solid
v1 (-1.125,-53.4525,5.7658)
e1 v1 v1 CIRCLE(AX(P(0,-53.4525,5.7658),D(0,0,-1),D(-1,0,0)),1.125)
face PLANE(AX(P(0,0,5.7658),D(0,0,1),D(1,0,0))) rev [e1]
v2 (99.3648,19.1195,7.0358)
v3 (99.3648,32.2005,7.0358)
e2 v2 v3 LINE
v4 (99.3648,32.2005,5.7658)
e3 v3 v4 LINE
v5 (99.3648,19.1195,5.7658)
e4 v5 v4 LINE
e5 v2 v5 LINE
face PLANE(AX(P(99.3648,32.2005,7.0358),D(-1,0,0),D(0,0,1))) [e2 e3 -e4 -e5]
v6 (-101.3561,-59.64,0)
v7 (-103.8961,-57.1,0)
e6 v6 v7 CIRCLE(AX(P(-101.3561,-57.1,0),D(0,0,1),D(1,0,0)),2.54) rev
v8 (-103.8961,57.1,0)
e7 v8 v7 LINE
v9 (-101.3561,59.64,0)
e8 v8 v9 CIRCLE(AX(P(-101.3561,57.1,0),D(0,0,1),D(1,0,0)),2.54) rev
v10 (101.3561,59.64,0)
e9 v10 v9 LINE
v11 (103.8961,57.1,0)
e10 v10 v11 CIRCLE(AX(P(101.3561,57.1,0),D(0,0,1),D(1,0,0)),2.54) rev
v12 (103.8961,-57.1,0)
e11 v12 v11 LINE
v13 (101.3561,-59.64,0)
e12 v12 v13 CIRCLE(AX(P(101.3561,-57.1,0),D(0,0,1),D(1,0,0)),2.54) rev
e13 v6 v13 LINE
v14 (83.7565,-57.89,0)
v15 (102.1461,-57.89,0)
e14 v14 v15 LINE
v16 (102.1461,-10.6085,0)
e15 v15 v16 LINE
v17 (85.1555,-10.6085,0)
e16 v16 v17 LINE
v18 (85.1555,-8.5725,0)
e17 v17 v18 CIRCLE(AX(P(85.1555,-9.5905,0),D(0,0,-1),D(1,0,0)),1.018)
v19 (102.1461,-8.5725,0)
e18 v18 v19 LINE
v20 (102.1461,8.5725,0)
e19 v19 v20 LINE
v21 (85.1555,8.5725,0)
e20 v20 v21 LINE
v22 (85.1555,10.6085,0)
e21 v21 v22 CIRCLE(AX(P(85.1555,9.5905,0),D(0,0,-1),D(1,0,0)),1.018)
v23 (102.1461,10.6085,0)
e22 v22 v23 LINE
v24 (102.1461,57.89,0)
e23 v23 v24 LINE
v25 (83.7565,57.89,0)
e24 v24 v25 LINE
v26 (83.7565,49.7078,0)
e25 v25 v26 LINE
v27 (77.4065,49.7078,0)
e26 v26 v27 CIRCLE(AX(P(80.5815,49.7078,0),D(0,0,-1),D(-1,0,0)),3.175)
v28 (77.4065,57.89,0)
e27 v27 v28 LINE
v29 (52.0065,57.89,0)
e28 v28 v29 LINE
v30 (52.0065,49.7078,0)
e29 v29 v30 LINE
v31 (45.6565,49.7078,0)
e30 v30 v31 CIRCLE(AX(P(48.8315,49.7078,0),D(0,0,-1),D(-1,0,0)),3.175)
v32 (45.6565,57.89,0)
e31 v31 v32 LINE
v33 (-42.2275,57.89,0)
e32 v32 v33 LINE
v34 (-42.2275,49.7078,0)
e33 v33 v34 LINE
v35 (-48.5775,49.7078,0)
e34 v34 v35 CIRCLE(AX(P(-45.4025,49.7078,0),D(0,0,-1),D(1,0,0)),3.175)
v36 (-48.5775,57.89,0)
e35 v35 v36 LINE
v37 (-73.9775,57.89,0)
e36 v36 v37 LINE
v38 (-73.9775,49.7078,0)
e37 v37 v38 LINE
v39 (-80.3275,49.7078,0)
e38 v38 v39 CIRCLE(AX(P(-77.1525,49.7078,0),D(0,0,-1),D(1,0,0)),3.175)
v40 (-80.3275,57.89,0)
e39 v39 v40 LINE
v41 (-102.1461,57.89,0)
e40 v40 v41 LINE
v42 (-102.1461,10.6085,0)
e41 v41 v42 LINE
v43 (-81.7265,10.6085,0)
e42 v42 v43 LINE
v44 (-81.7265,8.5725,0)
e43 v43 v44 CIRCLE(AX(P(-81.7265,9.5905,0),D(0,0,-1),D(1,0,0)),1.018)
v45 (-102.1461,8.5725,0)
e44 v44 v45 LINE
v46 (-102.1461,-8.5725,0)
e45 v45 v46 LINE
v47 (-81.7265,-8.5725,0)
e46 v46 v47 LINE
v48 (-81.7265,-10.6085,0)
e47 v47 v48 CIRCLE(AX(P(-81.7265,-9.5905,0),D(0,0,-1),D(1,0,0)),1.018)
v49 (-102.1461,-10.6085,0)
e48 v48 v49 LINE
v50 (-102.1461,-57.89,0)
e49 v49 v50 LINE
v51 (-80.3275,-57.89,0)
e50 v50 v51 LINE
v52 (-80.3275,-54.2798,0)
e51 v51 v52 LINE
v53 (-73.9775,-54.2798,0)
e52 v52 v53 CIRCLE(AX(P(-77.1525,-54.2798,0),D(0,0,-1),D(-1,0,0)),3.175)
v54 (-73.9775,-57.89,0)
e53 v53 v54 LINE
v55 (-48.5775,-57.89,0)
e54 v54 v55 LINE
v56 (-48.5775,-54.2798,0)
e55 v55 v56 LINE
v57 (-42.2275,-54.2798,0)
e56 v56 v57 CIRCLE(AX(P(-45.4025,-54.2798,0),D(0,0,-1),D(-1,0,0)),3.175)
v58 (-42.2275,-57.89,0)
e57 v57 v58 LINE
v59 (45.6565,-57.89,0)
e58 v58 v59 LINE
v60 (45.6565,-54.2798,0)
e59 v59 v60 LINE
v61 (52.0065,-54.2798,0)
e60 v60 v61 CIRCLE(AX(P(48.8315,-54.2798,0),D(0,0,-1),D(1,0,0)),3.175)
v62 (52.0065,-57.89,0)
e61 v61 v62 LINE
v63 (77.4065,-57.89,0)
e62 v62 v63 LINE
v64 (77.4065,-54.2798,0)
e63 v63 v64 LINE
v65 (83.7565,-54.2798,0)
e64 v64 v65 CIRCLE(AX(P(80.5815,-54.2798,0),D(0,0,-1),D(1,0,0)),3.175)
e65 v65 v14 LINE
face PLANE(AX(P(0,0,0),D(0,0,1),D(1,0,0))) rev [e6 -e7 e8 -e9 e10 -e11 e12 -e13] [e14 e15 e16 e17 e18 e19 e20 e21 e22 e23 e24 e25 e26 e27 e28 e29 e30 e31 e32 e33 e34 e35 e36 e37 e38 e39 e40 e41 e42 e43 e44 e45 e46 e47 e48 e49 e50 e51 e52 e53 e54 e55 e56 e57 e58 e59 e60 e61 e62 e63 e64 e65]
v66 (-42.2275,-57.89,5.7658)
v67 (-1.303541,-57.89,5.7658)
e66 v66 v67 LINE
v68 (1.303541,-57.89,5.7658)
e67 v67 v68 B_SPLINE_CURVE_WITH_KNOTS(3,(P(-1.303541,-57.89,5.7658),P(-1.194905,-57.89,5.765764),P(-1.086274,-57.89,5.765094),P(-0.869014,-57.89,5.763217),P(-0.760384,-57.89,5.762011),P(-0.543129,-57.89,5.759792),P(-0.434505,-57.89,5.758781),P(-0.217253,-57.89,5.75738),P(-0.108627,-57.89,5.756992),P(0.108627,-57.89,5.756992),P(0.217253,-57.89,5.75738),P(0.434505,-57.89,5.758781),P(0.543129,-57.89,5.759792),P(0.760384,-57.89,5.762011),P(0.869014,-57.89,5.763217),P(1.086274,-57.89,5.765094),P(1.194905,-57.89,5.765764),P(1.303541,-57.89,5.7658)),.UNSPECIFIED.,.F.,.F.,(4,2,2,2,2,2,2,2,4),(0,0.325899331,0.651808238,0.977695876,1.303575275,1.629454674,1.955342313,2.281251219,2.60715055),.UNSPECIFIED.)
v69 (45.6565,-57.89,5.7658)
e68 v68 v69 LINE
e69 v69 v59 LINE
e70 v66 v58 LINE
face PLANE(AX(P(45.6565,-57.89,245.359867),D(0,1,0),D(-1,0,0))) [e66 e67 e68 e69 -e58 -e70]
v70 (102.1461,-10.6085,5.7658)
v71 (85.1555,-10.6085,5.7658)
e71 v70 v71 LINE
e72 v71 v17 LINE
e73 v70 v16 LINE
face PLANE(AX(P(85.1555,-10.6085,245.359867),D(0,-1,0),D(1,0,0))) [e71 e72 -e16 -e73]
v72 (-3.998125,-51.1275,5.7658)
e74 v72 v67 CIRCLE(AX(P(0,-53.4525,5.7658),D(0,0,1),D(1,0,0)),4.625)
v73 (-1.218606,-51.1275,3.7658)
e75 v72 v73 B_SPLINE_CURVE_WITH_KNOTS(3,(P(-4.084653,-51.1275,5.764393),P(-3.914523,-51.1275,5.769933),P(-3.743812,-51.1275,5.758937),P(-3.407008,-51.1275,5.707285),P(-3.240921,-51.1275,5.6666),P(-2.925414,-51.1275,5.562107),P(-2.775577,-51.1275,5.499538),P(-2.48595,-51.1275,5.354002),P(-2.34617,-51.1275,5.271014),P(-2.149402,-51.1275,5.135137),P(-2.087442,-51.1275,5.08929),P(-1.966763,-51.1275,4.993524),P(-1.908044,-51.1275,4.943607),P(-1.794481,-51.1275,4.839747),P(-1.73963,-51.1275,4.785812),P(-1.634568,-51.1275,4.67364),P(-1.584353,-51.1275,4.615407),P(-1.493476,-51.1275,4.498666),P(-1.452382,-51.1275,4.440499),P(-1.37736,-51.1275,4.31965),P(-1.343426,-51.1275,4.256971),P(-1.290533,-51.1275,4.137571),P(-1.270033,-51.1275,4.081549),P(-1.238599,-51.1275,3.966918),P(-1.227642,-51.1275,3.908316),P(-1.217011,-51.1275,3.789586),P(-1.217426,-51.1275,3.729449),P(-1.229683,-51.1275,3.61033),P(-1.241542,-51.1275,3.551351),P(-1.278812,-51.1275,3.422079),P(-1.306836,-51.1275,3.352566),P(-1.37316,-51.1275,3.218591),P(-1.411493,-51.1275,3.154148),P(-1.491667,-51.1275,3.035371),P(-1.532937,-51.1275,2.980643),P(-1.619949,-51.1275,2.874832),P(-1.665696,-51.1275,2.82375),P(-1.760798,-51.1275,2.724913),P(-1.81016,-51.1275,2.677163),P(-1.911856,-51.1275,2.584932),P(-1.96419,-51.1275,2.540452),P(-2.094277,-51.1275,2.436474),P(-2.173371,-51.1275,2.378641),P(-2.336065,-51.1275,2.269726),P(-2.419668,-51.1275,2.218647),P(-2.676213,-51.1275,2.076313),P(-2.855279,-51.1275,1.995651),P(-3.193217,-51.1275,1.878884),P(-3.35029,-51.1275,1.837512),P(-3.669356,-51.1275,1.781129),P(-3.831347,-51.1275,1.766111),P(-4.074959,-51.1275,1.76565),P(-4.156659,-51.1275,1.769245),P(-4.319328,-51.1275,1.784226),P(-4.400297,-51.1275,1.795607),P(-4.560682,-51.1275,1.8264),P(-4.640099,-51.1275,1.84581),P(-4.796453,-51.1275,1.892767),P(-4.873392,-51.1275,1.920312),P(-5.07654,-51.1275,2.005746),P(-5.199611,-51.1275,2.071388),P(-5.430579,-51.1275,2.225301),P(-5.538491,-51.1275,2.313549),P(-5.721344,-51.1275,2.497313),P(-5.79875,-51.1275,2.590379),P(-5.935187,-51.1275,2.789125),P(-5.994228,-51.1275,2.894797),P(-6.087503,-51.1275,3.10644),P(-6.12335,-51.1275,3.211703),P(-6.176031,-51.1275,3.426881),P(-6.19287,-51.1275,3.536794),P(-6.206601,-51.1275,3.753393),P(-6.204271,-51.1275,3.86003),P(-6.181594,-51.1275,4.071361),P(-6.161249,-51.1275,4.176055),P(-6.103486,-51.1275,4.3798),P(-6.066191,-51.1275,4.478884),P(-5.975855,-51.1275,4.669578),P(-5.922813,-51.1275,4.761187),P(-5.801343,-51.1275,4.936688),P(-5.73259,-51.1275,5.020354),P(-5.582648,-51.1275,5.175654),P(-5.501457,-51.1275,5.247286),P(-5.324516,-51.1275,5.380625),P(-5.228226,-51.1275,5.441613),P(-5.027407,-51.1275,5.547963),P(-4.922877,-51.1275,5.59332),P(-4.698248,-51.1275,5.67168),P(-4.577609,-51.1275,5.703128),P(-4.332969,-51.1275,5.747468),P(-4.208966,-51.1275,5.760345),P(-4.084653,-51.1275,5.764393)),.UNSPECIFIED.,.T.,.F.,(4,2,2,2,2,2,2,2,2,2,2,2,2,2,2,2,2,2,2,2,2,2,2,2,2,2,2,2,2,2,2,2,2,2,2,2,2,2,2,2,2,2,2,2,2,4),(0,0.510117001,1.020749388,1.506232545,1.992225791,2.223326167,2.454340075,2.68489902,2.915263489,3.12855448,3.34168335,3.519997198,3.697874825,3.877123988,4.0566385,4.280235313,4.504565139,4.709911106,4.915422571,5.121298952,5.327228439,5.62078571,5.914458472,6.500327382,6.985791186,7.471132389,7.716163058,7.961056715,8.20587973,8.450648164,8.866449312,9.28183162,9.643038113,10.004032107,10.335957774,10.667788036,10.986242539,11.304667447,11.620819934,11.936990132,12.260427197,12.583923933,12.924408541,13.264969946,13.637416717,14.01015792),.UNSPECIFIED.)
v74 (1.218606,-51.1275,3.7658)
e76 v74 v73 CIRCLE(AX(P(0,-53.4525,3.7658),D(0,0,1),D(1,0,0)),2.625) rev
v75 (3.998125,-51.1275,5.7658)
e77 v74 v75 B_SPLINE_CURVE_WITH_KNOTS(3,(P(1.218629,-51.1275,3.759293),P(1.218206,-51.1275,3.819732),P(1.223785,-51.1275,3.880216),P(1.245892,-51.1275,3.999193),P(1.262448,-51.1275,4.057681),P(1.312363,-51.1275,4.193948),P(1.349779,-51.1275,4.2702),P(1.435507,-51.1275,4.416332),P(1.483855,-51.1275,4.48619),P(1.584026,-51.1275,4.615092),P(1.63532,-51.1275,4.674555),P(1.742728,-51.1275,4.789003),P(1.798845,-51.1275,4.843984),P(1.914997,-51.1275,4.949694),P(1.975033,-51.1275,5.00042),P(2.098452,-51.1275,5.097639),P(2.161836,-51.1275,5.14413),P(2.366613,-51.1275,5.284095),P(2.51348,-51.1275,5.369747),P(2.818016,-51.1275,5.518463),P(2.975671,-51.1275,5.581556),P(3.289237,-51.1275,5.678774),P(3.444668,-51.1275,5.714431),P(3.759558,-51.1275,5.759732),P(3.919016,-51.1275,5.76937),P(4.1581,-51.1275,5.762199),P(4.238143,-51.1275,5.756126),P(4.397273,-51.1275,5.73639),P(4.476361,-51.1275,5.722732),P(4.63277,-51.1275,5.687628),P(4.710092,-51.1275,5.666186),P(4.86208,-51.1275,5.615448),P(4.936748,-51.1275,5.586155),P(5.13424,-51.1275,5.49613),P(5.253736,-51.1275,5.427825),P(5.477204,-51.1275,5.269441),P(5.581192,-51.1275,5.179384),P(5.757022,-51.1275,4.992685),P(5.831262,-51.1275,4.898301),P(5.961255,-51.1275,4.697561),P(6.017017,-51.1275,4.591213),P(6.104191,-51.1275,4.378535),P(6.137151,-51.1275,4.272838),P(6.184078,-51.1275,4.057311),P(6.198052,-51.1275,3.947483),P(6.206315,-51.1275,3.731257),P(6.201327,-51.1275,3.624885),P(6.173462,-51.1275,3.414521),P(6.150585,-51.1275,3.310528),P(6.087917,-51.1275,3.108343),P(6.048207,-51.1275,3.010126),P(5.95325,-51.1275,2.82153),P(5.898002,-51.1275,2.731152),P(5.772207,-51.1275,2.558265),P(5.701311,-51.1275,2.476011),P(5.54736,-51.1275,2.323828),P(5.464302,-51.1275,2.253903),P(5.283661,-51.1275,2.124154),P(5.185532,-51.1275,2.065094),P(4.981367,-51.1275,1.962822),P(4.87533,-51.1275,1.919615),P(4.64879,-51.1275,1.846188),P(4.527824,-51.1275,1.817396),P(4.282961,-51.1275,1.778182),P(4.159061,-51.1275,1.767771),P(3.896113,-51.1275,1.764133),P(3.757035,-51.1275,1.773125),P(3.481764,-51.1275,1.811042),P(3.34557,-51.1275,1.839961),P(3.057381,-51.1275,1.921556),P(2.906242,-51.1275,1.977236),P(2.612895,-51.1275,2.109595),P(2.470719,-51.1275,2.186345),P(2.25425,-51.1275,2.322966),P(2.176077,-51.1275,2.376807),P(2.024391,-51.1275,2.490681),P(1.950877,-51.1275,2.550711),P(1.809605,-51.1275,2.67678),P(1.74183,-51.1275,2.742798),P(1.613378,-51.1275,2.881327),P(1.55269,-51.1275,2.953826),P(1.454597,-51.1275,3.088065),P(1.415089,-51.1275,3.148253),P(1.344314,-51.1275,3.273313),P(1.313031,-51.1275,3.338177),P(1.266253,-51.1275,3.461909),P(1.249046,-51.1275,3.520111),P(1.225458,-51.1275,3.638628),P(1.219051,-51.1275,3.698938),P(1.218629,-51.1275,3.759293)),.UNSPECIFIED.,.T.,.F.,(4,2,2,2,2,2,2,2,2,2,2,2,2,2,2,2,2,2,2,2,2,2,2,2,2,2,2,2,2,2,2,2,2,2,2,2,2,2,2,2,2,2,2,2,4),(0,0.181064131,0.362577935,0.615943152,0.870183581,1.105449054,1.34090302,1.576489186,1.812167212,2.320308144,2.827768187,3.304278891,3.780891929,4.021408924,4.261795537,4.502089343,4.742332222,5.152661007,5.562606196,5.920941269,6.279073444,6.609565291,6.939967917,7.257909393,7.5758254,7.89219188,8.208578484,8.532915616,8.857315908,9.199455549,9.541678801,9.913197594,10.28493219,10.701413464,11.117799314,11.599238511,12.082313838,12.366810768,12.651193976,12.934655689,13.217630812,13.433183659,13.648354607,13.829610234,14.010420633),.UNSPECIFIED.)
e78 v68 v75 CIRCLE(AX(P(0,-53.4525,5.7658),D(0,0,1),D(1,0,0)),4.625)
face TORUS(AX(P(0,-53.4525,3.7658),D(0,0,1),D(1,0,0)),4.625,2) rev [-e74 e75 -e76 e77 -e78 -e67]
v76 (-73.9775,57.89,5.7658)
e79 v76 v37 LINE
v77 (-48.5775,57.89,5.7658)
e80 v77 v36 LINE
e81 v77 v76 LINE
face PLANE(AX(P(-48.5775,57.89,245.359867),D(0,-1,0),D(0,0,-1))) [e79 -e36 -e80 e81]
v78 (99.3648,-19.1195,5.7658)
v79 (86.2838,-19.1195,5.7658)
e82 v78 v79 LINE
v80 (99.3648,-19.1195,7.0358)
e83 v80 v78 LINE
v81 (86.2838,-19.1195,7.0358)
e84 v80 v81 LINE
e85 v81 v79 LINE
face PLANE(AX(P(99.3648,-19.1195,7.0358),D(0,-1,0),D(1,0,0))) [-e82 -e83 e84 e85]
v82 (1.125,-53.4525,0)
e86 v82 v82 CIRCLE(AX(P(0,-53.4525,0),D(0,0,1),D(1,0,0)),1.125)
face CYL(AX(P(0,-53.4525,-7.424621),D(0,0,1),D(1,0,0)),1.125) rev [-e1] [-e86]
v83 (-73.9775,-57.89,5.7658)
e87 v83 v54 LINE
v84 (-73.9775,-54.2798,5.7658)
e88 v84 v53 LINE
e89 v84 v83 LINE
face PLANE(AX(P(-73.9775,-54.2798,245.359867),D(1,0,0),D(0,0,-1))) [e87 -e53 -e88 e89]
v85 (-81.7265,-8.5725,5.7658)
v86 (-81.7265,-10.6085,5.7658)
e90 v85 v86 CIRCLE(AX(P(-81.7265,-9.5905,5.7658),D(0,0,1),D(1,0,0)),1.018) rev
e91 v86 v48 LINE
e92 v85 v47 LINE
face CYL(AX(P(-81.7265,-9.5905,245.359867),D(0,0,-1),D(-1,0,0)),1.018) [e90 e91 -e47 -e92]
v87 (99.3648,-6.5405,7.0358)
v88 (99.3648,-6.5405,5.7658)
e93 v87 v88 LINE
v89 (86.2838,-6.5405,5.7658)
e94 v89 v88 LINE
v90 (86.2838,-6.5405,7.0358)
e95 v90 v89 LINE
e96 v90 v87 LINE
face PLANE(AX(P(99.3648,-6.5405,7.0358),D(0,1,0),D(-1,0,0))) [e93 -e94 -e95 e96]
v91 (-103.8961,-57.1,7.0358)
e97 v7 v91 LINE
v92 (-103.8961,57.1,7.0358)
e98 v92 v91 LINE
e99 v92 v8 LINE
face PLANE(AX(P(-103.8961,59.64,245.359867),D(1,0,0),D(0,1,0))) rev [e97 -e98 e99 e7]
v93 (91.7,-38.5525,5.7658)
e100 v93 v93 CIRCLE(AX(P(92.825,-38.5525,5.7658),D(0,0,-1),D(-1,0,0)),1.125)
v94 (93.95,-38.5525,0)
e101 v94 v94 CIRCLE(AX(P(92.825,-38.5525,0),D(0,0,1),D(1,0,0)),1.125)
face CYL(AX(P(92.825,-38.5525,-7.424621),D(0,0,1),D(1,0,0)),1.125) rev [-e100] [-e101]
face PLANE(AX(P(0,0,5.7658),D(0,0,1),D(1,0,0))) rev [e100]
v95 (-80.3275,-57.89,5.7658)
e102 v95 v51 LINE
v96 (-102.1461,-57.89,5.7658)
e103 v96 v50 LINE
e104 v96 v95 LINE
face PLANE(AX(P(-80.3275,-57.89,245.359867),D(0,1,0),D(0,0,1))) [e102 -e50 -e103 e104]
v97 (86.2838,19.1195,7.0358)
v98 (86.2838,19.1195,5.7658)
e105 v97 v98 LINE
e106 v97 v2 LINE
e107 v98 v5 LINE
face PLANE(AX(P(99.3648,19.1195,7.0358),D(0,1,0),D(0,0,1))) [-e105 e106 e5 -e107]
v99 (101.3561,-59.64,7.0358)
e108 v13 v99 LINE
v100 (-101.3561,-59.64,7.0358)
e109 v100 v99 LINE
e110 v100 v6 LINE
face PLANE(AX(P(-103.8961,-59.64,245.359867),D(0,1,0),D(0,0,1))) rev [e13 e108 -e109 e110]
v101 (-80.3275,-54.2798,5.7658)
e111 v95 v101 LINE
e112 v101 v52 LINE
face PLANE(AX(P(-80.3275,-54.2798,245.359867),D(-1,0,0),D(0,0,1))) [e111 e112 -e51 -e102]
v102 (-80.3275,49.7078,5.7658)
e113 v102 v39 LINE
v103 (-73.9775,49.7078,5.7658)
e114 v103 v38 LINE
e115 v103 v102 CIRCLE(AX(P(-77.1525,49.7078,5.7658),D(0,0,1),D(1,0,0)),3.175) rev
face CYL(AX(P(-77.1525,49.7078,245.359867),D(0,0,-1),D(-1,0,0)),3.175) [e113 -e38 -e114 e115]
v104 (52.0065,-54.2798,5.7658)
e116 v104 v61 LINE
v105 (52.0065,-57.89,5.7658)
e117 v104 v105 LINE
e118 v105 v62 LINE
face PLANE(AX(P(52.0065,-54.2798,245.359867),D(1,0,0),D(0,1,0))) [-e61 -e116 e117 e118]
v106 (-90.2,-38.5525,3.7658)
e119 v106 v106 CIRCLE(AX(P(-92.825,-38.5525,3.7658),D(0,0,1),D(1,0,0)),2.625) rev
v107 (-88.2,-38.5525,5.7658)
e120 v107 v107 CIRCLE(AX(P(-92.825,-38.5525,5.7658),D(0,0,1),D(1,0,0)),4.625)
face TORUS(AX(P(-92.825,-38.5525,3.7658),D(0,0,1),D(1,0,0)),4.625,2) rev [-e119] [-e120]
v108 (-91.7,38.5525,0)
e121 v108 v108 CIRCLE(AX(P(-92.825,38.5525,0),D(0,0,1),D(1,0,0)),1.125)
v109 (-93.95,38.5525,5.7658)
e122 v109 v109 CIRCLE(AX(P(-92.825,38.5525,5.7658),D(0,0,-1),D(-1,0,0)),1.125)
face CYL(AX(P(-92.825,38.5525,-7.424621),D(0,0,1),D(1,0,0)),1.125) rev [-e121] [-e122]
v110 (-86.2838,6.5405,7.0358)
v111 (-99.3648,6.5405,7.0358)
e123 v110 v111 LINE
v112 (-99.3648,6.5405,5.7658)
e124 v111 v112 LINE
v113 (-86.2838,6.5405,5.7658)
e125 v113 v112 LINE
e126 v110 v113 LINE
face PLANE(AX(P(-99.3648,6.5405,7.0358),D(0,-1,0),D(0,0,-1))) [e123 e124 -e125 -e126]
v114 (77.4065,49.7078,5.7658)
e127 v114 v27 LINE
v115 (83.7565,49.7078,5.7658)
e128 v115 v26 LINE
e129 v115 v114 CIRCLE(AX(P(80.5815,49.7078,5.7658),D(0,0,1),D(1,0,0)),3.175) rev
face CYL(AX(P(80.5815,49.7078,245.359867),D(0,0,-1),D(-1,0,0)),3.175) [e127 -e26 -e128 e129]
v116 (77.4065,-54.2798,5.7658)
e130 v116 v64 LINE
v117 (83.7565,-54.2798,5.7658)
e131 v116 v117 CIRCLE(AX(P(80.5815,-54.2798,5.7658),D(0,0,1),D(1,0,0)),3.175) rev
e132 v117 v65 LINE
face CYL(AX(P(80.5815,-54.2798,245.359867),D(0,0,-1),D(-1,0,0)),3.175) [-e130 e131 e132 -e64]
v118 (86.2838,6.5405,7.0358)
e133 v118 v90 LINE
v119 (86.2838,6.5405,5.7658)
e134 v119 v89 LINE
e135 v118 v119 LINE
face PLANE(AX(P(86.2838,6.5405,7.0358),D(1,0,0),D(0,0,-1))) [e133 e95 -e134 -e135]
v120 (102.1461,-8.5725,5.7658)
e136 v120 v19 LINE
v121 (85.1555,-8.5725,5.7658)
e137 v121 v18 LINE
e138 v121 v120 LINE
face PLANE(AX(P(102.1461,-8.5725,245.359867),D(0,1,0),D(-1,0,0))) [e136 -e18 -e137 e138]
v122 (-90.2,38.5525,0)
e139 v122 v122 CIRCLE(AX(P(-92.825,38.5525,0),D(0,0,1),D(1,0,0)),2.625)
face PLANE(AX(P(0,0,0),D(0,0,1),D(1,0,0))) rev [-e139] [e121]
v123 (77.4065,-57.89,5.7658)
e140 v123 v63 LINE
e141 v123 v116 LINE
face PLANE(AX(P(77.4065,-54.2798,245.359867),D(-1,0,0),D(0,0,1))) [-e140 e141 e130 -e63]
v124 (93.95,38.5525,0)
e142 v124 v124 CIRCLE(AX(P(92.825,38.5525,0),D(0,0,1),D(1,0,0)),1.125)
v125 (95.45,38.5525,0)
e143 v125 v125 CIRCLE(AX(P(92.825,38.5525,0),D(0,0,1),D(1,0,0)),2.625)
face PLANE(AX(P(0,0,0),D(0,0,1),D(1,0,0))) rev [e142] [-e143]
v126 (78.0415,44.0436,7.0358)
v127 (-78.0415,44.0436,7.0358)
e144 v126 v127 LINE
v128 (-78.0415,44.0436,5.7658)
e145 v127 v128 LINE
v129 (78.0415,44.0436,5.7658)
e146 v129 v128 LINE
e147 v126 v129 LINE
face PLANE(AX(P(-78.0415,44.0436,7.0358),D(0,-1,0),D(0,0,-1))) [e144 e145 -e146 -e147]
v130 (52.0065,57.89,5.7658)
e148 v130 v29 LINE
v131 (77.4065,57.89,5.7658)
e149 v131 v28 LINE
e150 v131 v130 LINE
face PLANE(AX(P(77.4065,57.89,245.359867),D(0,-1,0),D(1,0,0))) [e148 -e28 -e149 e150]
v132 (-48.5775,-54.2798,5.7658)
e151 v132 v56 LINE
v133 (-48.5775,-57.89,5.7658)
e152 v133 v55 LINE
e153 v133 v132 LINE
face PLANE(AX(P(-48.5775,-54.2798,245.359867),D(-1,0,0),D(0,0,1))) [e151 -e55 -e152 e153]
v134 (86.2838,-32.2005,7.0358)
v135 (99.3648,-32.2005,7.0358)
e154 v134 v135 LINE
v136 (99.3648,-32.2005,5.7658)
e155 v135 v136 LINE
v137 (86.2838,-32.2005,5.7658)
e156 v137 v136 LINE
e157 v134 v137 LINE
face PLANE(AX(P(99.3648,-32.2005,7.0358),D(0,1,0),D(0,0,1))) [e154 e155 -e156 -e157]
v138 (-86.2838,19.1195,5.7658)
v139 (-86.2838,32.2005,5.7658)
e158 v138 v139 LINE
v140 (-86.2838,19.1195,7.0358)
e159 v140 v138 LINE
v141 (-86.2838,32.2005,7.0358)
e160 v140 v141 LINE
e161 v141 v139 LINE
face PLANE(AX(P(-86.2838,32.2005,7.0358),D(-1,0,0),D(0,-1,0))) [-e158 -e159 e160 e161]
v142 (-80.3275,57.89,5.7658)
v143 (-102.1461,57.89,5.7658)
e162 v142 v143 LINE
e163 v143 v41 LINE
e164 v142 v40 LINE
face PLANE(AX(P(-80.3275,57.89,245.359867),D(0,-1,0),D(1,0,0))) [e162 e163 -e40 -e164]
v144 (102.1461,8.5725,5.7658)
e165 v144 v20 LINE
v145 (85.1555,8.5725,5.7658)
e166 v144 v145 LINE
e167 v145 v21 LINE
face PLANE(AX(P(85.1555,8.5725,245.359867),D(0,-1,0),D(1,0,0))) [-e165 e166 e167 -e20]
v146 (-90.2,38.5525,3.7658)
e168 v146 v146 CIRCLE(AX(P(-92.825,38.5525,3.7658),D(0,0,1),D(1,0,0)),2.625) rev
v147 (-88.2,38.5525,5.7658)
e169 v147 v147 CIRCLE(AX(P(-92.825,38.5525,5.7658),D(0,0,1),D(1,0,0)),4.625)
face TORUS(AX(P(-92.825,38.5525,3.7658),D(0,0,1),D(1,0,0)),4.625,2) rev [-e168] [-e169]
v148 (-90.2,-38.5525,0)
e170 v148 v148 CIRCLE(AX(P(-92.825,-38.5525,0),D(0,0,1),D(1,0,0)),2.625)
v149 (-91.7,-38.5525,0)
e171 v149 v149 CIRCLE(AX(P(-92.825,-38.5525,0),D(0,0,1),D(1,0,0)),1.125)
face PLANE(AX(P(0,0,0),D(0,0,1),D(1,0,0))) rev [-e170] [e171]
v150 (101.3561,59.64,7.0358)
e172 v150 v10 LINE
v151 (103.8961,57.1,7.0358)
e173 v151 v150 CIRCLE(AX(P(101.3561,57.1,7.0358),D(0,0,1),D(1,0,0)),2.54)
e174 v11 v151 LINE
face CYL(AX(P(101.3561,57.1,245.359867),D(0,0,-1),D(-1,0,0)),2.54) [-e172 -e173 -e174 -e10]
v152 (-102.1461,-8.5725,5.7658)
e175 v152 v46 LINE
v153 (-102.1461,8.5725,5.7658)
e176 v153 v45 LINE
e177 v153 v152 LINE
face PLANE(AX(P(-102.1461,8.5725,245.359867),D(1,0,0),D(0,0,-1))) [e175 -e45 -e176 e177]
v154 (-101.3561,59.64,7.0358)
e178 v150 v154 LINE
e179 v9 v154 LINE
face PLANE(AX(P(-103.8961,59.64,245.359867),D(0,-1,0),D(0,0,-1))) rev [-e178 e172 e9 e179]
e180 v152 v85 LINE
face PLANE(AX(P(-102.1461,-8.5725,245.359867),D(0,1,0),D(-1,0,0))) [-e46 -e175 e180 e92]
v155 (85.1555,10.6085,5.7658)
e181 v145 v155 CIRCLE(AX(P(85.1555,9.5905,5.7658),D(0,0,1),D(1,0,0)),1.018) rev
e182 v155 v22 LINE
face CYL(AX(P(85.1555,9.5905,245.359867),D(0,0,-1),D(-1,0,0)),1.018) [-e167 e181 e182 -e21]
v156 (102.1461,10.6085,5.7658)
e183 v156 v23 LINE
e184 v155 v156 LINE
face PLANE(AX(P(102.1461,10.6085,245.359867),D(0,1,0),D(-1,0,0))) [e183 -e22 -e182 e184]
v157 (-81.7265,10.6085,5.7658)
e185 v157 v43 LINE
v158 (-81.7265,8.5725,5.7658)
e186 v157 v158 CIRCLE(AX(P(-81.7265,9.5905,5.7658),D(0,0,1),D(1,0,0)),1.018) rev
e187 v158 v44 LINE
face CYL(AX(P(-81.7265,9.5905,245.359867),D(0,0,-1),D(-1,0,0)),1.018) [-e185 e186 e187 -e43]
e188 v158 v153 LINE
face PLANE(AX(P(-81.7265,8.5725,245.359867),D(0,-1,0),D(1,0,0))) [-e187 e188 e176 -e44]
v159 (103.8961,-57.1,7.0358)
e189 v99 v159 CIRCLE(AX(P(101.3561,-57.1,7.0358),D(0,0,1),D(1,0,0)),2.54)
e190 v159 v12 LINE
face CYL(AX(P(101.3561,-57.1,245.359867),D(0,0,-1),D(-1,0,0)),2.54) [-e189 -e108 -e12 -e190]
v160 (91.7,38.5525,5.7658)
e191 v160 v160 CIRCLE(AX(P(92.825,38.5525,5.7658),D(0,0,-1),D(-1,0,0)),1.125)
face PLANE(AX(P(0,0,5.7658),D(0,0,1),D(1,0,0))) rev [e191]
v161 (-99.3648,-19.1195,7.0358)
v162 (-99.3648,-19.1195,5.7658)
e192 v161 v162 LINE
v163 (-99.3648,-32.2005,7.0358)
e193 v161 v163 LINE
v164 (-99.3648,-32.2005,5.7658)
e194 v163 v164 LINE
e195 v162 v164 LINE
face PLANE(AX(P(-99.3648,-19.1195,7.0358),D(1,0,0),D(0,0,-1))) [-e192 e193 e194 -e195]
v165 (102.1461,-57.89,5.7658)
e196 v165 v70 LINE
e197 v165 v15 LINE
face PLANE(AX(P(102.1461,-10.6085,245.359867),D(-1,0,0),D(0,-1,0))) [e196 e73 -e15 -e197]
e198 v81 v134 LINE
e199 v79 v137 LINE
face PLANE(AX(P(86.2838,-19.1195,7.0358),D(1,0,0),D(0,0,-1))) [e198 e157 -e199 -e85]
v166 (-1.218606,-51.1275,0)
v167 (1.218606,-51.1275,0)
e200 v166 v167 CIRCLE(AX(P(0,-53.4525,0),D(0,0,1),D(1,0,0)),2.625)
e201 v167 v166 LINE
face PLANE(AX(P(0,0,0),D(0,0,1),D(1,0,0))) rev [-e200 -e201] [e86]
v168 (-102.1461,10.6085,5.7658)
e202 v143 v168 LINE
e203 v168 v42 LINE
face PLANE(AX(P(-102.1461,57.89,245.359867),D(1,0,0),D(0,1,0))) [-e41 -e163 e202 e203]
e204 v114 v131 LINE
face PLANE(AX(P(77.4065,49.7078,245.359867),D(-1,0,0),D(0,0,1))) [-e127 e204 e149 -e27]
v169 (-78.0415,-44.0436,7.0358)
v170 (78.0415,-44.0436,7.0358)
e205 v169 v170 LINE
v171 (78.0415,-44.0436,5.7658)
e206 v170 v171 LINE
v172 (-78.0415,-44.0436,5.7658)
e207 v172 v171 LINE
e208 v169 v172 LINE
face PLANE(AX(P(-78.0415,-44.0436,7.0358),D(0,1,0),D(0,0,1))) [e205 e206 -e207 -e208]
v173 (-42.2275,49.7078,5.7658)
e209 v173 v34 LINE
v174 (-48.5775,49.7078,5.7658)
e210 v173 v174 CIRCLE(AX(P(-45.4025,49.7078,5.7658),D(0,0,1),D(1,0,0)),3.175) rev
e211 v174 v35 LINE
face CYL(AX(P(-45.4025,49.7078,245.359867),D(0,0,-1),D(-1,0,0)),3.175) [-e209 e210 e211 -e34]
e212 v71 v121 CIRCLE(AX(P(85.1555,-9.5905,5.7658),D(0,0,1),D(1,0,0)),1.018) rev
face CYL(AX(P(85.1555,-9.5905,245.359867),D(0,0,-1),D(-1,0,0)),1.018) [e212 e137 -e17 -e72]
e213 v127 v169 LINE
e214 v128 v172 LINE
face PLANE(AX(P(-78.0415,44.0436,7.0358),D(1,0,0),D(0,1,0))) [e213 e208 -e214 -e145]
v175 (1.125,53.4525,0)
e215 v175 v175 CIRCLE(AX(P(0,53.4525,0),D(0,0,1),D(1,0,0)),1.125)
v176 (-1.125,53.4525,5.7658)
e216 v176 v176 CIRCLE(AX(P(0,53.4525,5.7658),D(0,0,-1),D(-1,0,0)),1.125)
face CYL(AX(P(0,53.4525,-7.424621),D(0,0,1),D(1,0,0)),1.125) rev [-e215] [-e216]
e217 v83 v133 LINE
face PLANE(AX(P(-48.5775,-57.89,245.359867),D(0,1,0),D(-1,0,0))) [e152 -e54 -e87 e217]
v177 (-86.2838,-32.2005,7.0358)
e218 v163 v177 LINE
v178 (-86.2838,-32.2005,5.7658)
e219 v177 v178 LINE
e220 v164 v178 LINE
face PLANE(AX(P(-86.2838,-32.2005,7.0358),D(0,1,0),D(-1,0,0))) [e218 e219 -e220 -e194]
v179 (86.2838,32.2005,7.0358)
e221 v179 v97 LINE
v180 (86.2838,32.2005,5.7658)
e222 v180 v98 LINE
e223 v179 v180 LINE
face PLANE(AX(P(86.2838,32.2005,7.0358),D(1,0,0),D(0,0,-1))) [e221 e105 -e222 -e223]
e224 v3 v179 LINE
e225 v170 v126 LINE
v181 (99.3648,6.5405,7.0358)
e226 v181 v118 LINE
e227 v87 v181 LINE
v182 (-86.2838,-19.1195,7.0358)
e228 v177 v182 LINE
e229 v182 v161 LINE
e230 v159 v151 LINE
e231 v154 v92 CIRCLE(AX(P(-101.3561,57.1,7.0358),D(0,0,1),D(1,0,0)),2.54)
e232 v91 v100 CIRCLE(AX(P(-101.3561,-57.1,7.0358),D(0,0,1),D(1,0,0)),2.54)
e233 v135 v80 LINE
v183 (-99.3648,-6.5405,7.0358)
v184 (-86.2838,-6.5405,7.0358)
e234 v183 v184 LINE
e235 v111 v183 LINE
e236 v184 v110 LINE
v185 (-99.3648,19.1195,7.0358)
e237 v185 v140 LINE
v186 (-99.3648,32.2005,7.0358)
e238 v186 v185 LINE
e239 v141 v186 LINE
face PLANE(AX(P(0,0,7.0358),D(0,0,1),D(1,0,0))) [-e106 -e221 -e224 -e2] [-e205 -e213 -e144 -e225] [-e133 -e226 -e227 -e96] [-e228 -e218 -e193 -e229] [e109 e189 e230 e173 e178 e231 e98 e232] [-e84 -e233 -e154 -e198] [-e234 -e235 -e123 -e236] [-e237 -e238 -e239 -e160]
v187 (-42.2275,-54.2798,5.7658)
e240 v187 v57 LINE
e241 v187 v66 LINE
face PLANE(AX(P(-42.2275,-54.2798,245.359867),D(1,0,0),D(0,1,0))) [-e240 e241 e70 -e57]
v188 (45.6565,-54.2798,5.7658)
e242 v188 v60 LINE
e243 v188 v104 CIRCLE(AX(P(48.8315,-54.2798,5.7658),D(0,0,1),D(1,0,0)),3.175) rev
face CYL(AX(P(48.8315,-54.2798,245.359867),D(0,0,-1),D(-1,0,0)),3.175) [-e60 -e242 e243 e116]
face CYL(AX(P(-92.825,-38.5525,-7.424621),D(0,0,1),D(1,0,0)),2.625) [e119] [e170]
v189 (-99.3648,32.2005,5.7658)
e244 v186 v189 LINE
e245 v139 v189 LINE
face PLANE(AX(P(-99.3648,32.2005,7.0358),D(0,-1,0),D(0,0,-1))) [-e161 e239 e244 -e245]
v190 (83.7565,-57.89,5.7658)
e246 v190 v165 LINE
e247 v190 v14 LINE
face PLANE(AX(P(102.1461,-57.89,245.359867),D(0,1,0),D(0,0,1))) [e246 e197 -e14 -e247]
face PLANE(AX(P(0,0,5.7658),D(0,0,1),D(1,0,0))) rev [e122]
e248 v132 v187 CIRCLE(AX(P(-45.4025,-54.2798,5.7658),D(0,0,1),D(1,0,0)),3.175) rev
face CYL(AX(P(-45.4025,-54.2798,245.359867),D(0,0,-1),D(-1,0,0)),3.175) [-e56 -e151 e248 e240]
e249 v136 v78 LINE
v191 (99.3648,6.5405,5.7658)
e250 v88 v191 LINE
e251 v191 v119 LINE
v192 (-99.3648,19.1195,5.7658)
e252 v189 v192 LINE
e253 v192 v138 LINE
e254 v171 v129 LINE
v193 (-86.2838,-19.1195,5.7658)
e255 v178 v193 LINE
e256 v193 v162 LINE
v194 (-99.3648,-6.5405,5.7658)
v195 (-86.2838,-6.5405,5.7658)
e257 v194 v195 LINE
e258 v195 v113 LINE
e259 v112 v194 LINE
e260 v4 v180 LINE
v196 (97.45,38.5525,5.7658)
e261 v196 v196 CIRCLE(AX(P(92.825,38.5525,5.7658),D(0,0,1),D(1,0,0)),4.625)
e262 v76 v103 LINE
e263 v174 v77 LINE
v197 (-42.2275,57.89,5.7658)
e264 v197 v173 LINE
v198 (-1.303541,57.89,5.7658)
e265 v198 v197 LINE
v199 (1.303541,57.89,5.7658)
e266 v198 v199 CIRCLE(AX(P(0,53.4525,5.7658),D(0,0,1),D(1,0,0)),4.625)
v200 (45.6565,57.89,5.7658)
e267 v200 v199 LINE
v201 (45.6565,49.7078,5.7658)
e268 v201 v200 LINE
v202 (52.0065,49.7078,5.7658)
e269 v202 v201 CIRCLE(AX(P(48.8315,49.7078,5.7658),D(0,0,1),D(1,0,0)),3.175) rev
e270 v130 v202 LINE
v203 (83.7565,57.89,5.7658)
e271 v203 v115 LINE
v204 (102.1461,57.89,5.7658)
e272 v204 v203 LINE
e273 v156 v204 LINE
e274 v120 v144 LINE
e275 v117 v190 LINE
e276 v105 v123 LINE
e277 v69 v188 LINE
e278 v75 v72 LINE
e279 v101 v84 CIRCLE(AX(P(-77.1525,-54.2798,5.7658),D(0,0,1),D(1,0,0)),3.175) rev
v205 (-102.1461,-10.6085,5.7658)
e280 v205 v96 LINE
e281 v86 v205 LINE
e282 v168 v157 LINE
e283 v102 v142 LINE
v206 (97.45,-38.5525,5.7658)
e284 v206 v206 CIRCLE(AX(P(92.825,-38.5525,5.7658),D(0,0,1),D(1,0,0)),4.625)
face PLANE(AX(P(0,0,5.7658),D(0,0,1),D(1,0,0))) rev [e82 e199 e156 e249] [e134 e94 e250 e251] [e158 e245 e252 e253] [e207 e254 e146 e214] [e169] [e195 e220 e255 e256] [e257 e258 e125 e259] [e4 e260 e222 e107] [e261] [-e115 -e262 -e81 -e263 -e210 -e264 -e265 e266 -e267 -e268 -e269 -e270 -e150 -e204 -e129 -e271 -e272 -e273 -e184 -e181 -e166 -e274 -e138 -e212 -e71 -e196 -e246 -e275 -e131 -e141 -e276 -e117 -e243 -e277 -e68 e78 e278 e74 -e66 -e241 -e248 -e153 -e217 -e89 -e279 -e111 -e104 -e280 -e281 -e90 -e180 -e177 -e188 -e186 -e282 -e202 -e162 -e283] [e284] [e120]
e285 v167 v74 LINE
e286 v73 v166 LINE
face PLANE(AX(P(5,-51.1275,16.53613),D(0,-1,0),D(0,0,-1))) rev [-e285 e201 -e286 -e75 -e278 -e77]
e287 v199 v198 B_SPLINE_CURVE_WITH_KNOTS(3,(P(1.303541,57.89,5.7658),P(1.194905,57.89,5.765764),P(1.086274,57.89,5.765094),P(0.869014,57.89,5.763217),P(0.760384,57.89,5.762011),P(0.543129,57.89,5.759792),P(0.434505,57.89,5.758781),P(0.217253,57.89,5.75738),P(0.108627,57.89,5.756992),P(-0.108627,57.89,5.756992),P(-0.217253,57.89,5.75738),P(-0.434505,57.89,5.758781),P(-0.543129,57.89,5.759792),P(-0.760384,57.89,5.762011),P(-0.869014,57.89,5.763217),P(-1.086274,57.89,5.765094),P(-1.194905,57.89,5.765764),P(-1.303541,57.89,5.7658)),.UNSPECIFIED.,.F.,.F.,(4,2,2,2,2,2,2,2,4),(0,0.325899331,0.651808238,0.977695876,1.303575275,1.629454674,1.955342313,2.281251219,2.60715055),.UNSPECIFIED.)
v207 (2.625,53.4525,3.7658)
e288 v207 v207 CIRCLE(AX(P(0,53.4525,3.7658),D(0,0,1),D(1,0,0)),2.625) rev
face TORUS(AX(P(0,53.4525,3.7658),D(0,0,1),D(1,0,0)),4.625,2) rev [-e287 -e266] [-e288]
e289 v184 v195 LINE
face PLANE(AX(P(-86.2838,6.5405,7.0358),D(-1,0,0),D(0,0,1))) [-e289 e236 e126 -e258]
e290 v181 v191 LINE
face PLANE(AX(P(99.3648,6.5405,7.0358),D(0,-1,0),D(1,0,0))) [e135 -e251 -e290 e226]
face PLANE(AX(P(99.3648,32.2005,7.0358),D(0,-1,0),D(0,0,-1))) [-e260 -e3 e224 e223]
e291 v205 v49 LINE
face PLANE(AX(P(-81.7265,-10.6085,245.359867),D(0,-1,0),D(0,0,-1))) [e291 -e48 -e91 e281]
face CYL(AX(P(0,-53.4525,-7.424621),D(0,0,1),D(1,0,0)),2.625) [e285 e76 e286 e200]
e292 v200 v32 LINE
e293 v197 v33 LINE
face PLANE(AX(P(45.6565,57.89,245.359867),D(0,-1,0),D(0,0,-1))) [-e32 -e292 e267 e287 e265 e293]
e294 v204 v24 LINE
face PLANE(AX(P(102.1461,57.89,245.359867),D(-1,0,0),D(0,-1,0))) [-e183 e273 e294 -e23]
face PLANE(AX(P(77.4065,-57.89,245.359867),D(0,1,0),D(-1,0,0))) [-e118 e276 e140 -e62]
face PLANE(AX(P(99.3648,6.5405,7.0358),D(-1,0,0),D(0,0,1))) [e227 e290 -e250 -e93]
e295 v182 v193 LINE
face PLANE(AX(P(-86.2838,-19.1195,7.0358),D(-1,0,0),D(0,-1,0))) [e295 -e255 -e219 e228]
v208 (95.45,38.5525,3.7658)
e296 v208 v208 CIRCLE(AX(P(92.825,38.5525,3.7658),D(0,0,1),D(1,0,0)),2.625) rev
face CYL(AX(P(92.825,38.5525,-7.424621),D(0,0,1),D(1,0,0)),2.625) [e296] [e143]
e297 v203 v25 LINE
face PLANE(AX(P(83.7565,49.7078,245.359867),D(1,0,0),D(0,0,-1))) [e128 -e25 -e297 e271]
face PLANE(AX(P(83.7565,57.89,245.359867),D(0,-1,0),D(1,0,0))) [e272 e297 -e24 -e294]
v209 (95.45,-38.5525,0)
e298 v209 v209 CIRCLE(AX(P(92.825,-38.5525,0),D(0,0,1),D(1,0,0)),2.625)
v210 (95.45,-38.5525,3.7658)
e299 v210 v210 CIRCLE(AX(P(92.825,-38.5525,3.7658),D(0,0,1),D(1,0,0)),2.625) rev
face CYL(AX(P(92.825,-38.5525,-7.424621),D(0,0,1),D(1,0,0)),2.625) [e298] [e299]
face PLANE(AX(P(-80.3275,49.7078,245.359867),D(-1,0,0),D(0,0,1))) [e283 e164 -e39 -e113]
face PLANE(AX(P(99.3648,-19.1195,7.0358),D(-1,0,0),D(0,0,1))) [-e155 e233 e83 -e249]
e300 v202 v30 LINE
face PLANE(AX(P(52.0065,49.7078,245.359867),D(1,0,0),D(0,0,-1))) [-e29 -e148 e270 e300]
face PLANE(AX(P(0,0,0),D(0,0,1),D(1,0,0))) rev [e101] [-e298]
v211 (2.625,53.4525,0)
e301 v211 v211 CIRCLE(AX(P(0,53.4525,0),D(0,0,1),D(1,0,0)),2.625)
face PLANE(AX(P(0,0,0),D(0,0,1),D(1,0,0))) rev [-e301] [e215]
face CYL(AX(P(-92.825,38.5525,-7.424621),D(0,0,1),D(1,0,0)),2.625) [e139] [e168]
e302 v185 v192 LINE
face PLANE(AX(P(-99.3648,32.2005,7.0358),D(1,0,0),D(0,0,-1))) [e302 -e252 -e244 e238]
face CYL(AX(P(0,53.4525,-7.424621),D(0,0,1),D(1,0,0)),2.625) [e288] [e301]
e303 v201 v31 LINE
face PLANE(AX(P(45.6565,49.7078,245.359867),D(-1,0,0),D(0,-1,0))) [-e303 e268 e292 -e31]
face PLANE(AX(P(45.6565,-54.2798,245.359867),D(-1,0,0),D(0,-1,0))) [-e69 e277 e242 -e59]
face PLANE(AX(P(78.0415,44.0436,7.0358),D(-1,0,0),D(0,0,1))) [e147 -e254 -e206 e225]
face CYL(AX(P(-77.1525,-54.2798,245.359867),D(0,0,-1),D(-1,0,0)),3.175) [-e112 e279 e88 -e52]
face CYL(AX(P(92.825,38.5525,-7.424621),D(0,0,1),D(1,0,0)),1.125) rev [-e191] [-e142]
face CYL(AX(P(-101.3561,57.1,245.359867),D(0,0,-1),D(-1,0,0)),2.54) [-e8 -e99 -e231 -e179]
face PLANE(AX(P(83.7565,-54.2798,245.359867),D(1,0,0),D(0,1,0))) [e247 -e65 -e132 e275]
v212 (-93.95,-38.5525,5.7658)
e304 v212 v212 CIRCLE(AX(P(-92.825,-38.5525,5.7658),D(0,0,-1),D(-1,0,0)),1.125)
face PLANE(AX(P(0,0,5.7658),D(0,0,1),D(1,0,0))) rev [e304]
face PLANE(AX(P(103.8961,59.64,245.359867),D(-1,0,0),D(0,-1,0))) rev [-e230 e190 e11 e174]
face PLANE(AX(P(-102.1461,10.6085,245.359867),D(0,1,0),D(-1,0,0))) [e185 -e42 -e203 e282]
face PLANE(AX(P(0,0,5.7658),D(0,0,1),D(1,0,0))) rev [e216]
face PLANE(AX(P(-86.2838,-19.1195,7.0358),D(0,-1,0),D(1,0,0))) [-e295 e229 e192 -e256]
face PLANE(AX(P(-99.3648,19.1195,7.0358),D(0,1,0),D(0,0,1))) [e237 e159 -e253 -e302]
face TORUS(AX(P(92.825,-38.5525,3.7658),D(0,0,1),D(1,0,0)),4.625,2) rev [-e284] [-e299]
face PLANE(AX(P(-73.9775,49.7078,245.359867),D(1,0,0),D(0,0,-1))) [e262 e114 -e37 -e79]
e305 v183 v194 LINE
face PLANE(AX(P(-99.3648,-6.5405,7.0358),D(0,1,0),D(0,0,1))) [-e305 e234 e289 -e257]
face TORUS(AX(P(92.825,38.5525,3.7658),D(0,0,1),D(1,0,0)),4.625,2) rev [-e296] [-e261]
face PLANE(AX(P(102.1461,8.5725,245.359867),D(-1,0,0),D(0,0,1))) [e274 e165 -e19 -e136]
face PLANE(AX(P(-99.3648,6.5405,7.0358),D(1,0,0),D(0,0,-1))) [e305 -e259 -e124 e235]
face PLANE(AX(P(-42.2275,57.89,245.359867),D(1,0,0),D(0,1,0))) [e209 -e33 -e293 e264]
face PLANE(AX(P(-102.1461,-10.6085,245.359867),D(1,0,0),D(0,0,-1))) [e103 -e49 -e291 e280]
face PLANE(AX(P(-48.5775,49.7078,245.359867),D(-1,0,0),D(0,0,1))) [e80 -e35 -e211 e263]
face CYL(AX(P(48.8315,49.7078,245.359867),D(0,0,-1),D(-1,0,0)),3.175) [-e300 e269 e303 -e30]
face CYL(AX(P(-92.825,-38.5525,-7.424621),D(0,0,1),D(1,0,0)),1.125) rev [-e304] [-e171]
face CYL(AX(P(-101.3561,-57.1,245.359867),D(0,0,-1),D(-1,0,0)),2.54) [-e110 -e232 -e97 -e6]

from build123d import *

# Parameters (mm, degrees)
SKETCH1_W           = 207.7922
SKETCH1_H           = 119.28
BOSS_EXTRUDE1_DEPTH = 5.7658
SKETCH2_W           = 207.7922
SKETCH2_H           = 119.28
SKETCH2_W_2         = 13.081
SKETCH2_H_2         = 13.081
SKETCH2_W_3         = 156.083
SKETCH2_H_3         = 88.0872
BOSS_EXTRUDE2_DEPTH = 1.27
FILLET1_R           = 2.54
SKETCH3_R           = 2.625
SKETCH3_R_2         = 1.125
BOSS_EXTRUDE3_DEPTH = 5.7658
FILLET2_R           = 2
CUT_EXTRUDE2_REACH  = 122.003
SKETCH4_W           = 10
SKETCH4_H           = 4


with BuildPart() as part:
    # Sketch1 → Boss-Extrude1 (new body)
    with BuildSketch(Plane.XY):
        Rectangle(SKETCH1_W, SKETCH1_H)
        with BuildLine():
            Line((83.7565, -54.2798), (83.7565, -57.89))
            Line((83.7565, -57.89), (102.1461, -57.89))
            Line((102.1461, -57.89), (102.1461, -10.6085))
            Line((102.1461, -10.6085), (85.1555, -10.6085))
            ThreePointArc((85.1555, -10.6085), (84.1375, -9.5905), (85.1555, -8.5725))
            Line((85.1555, -8.5725), (102.1461, -8.5725))
            Line((102.1461, -8.5725), (102.1461, 8.5725))
            Line((102.1461, 8.5725), (85.1555, 8.5725))
            ThreePointArc((85.1555, 8.5725), (84.1375, 9.5905), (85.1555, 10.6085))
            Line((85.1555, 10.6085), (102.1461, 10.6085))
            Line((102.1461, 10.6085), (102.1461, 57.89))
            Line((102.1461, 57.89), (83.7565, 57.89))
            Line((83.7565, 57.89), (83.7565, 49.7078))
            ThreePointArc((83.7565, 49.7078), (80.5815, 46.5328), (77.4065, 49.7078))
            Line((77.4065, 49.7078), (77.4065, 57.89))
            Line((77.4065, 57.89), (52.0065, 57.89))
            Line((52.0065, 57.89), (52.0065, 49.7078))
            ThreePointArc((52.0065, 49.7078), (48.8315, 46.5328), (45.6565, 49.7078))
            Line((45.6565, 49.7078), (45.6565, 57.89))
            Line((45.6565, 57.89), (-42.2275, 57.89))
            Line((-42.2275, 57.89), (-42.2275, 49.7078))
            ThreePointArc((-42.2275, 49.7078), (-45.4025, 46.5328), (-48.5775, 49.7078))
            Line((-48.5775, 49.7078), (-48.5775, 57.89))
            Line((-48.5775, 57.89), (-73.9775, 57.89))
            Line((-73.9775, 57.89), (-73.9775, 49.7078))
            ThreePointArc((-73.9775, 49.7078), (-77.1525, 46.5328), (-80.3275, 49.7078))
            Line((-80.3275, 49.7078), (-80.3275, 57.89))
            Line((-80.3275, 57.89), (-102.1461, 57.89))
            Line((-102.1461, 57.89), (-102.1461, 10.6085))
            Line((-102.1461, 10.6085), (-81.7265, 10.6085))
            ThreePointArc((-81.7265, 10.6085), (-80.7085, 9.5905), (-81.7265, 8.5725))
            Line((-81.7265, 8.5725), (-102.1461, 8.5725))
            Line((-102.1461, 8.5725), (-102.1461, -8.5725))
            Line((-102.1461, -8.5725), (-81.7265, -8.5725))
            ThreePointArc((-81.7265, -8.5725), (-80.7085, -9.5905), (-81.7265, -10.6085))
            Line((-81.7265, -10.6085), (-102.1461, -10.6085))
            Line((-102.1461, -10.6085), (-102.1461, -57.89))
            Line((-102.1461, -57.89), (-80.3275, -57.89))
            Line((-80.3275, -57.89), (-80.3275, -54.2798))
            ThreePointArc((-80.3275, -54.2798), (-77.1525, -51.1048), (-73.9775, -54.2798))
            Line((-73.9775, -54.2798), (-73.9775, -57.89))
            Line((-73.9775, -57.89), (-48.5775, -57.89))
            Line((-48.5775, -57.89), (-48.5775, -54.2798))
            ThreePointArc((-48.5775, -54.2798), (-45.4025, -51.1048), (-42.2275, -54.2798))
            Line((-42.2275, -54.2798), (-42.2275, -57.89))
            Line((-42.2275, -57.89), (45.6565, -57.89))
            Line((45.6565, -57.89), (45.6565, -54.2798))
            ThreePointArc((45.6565, -54.2798), (48.8315, -51.1048), (52.0065, -54.2798))
            Line((52.0065, -54.2798), (52.0065, -57.89))
            Line((52.0065, -57.89), (77.4065, -57.89))
            Line((77.4065, -57.89), (77.4065, -54.2798))
            ThreePointArc((77.4065, -54.2798), (80.5815, -51.1048), (83.7565, -54.2798))
        make_face(mode=Mode.SUBTRACT)
    extrude(amount=BOSS_EXTRUDE1_DEPTH)

    # Sketch2 → Boss-Extrude2 (add)
    with BuildSketch(Plane.XY.offset(5.7658)):
        Rectangle(SKETCH2_W, SKETCH2_H)
        with Locations((92.8243, 25.66)):
            Rectangle(SKETCH2_W_2, SKETCH2_H_2, mode=Mode.SUBTRACT)
        with Locations((92.8243, 0)):
            Rectangle(SKETCH2_W_2, SKETCH2_H_2, mode=Mode.SUBTRACT)
        with Locations((92.8243, -25.66)):
            Rectangle(SKETCH2_W_2, SKETCH2_H_2, mode=Mode.SUBTRACT)
        with Locations((-92.8243, -25.66)):
            Rectangle(SKETCH2_W_2, SKETCH2_H_2, mode=Mode.SUBTRACT)
        Rectangle(SKETCH2_W_3, SKETCH2_H_3, mode=Mode.SUBTRACT)
        with Locations((-92.8243, 0)):
            Rectangle(SKETCH2_W_2, SKETCH2_H_2, mode=Mode.SUBTRACT)
        with Locations((-92.8243, 25.66)):
            Rectangle(SKETCH2_W_2, SKETCH2_H_2, mode=Mode.SUBTRACT)
    extrude(amount=BOSS_EXTRUDE2_DEPTH)

    # Fillet1
    fillet1_edges = [part.edges().sort_by_distance(p)[0] for p in [
        (-103.8961, 59.64, 3.5179),
        (103.8961, 59.64, 3.5179),
        (103.8961, -59.64, 3.5179),
        (-103.8961, -59.64, 3.5179),
    ]]
    fillet(fillet1_edges, radius=FILLET1_R)

    # Sketch3 → Boss-Extrude3 (add)
    # profile 1 of 6: a face of its own
    with BuildSketch(Plane(origin=(0, 0, 5.7658), x_dir=(-1, 0, 0), z_dir=(0, 0, -1))):
        with Locations(Location((-92.825, 38.5525, 0), (0, 0, 180))):
            Circle(SKETCH3_R)
        with Locations(Location((-92.825, 38.5525, 0), (0, 0, 180))):
            Circle(SKETCH3_R_2, mode=Mode.SUBTRACT)
    # profile 2 of 6: a face of its own
    with BuildSketch(Plane(origin=(0, 0, 5.7658), x_dir=(-1, 0, 0), z_dir=(0, 0, -1))):
        with Locations(Location((92.825, 38.5525, 0), (0, 0, 180))):
            Circle(SKETCH3_R)
        with Locations(Location((92.825, 38.5525, 0), (0, 0, 180))):
            Circle(SKETCH3_R_2, mode=Mode.SUBTRACT)
    # profile 3 of 6: a face of its own
    with BuildSketch(Plane(origin=(0, 0, 5.7658), x_dir=(-1, 0, 0), z_dir=(0, 0, -1))):
        with Locations(Location((-92.825, -38.5525, 0), (0, 0, 180))):
            Circle(SKETCH3_R)
        with Locations(Location((-92.825, -38.5525, 0), (0, 0, 180))):
            Circle(SKETCH3_R_2, mode=Mode.SUBTRACT)
    # profile 4 of 6: a face of its own
    with BuildSketch(Plane(origin=(0, 0, 5.7658), x_dir=(-1, 0, 0), z_dir=(0, 0, -1))):
        with Locations(Location((92.825, -38.5525, 0), (0, 0, 180))):
            Circle(SKETCH3_R)
        with Locations(Location((92.825, -38.5525, 0), (0, 0, 180))):
            Circle(SKETCH3_R_2, mode=Mode.SUBTRACT)
    # profile 5 of 6: a face of its own
    with BuildSketch(Plane(origin=(0, 0, 5.7658), x_dir=(-1, 0, 0), z_dir=(0, 0, -1))):
        with Locations(Location((0, 53.4525, 0), (0, 0, 180))):
            Circle(SKETCH3_R)
        with Locations(Location((0, 53.4525, 0), (0, 0, 180))):
            Circle(SKETCH3_R_2, mode=Mode.SUBTRACT)
    # profile 6 of 6: a face of its own
    with BuildSketch(Plane(origin=(0, 0, 5.7658), x_dir=(-1, 0, 0), z_dir=(0, 0, -1))):
        with Locations(Location((0, -53.4525, 0), (0, 0, 180))):
            Circle(SKETCH3_R)
        with Locations(Location((0, -53.4525, 0), (0, 0, 180))):
            Circle(SKETCH3_R_2, mode=Mode.SUBTRACT)
    extrude(amount=BOSS_EXTRUDE3_DEPTH)

    # Fillet2
    # the kernel refuses this fillet: 2 mm, written as the material it adds along each edge
    with BuildSketch(Plane(origin=(92.825, 38.5525, 5.7658), x_dir=(1, 0, 0), z_dir=(0, 1, 0))) as fillet2_piece_1:
        with BuildLine():
            CenterArc((2.625 + FILLET2_R, FILLET2_R), FILLET2_R, 180, 90)
            Line((2.625, FILLET2_R), (2.625, 0))
            Line((2.625, 0), (2.625 + FILLET2_R, 0))
        make_face()
    revolve(axis=Axis((92.825, 38.5525, 5.7658), (0, 0, -1)))
    with BuildSketch(Plane(origin=(0, 53.4525, 5.7658), x_dir=(1, 0, 0), z_dir=(0, 1, 0))) as fillet2_piece_2:
        with BuildLine():
            CenterArc((2.625 + FILLET2_R, FILLET2_R), FILLET2_R, 180, 90)
            Line((2.625, FILLET2_R), (2.625, 0))
            Line((2.625, 0), (2.625 + FILLET2_R, 0))
        make_face()
    revolve(axis=Axis((0, 53.4525, 5.7658), (0, 0, -1)))
    with BuildSketch(Plane(origin=(-92.825, -38.5525, 5.7658), x_dir=(1, 0, 0), z_dir=(0, 1, 0))) as fillet2_piece_3:
        with BuildLine():
            CenterArc((2.625 + FILLET2_R, FILLET2_R), FILLET2_R, 180, 90)
            Line((2.625, FILLET2_R), (2.625, 0))
            Line((2.625, 0), (2.625 + FILLET2_R, 0))
        make_face()
    revolve(axis=Axis((-92.825, -38.5525, 5.7658), (0, 0, -1)))
    with BuildSketch(Plane(origin=(92.825, -38.5525, 5.7658), x_dir=(1, 0, 0), z_dir=(0, 1, 0))) as fillet2_piece_4:
        with BuildLine():
            CenterArc((2.625 + FILLET2_R, FILLET2_R), FILLET2_R, 180, 90)
            Line((2.625, FILLET2_R), (2.625, 0))
            Line((2.625, 0), (2.625 + FILLET2_R, 0))
        make_face()
    revolve(axis=Axis((92.825, -38.5525, 5.7658), (0, 0, -1)))
    with BuildSketch(Plane(origin=(-92.825, 38.5525, 5.7658), x_dir=(1, 0, 0), z_dir=(0, 1, 0))) as fillet2_piece_5:
        with BuildLine():
            CenterArc((2.625 + FILLET2_R, FILLET2_R), FILLET2_R, 180, 90)
            Line((2.625, FILLET2_R), (2.625, 0))
            Line((2.625, 0), (2.625 + FILLET2_R, 0))
        make_face()
    revolve(axis=Axis((-92.825, 38.5525, 5.7658), (0, 0, -1)))
    with BuildSketch(Plane(origin=(0, -53.4525, 5.7658), x_dir=(1, 0, 0), z_dir=(0, 1, 0))) as fillet2_piece_6:
        with BuildLine():
            CenterArc((2.625 + FILLET2_R, FILLET2_R), FILLET2_R, 180, 90)
            Line((2.625, FILLET2_R), (2.625, 0))
            Line((2.625, 0), (2.625 + FILLET2_R, 0))
        make_face()
    revolve(axis=Axis((0, -53.4525, 5.7658), (0, 0, -1)))

    # Cut-Extrude2: up to this face of the body (flat: up to its plane)
    cut_extrude2_end = Plane(part.part.faces().sort_by_distance((54.354697423, -56.0849, 5.7658))[0])
    # Sketch4 → Cut-Extrude2 (cut, up to the picked face)
    with BuildSketch(Plane(origin=(0, 0, 0), x_dir=(-1, 0, 0), z_dir=(0, 0, -1)), mode=Mode.PRIVATE) as cut_extrude2_sk1:
        with Locations((0, -49.1275)):
            Rectangle(SKETCH4_W, SKETCH4_H)
    cut_extrude2_tool1 = split(extrude(cut_extrude2_sk1.sketch, amount=-CUT_EXTRUDE2_REACH, mode=Mode.PRIVATE), bisect_by=cut_extrude2_end, keep=Keep.BOTH, mode=Mode.PRIVATE)
    add(cut_extrude2_tool1.solids().sort_by(Axis((0, -49.1275, 0), (0, 0, 1)))[0], mode=Mode.SUBTRACT)


solid = part.part
